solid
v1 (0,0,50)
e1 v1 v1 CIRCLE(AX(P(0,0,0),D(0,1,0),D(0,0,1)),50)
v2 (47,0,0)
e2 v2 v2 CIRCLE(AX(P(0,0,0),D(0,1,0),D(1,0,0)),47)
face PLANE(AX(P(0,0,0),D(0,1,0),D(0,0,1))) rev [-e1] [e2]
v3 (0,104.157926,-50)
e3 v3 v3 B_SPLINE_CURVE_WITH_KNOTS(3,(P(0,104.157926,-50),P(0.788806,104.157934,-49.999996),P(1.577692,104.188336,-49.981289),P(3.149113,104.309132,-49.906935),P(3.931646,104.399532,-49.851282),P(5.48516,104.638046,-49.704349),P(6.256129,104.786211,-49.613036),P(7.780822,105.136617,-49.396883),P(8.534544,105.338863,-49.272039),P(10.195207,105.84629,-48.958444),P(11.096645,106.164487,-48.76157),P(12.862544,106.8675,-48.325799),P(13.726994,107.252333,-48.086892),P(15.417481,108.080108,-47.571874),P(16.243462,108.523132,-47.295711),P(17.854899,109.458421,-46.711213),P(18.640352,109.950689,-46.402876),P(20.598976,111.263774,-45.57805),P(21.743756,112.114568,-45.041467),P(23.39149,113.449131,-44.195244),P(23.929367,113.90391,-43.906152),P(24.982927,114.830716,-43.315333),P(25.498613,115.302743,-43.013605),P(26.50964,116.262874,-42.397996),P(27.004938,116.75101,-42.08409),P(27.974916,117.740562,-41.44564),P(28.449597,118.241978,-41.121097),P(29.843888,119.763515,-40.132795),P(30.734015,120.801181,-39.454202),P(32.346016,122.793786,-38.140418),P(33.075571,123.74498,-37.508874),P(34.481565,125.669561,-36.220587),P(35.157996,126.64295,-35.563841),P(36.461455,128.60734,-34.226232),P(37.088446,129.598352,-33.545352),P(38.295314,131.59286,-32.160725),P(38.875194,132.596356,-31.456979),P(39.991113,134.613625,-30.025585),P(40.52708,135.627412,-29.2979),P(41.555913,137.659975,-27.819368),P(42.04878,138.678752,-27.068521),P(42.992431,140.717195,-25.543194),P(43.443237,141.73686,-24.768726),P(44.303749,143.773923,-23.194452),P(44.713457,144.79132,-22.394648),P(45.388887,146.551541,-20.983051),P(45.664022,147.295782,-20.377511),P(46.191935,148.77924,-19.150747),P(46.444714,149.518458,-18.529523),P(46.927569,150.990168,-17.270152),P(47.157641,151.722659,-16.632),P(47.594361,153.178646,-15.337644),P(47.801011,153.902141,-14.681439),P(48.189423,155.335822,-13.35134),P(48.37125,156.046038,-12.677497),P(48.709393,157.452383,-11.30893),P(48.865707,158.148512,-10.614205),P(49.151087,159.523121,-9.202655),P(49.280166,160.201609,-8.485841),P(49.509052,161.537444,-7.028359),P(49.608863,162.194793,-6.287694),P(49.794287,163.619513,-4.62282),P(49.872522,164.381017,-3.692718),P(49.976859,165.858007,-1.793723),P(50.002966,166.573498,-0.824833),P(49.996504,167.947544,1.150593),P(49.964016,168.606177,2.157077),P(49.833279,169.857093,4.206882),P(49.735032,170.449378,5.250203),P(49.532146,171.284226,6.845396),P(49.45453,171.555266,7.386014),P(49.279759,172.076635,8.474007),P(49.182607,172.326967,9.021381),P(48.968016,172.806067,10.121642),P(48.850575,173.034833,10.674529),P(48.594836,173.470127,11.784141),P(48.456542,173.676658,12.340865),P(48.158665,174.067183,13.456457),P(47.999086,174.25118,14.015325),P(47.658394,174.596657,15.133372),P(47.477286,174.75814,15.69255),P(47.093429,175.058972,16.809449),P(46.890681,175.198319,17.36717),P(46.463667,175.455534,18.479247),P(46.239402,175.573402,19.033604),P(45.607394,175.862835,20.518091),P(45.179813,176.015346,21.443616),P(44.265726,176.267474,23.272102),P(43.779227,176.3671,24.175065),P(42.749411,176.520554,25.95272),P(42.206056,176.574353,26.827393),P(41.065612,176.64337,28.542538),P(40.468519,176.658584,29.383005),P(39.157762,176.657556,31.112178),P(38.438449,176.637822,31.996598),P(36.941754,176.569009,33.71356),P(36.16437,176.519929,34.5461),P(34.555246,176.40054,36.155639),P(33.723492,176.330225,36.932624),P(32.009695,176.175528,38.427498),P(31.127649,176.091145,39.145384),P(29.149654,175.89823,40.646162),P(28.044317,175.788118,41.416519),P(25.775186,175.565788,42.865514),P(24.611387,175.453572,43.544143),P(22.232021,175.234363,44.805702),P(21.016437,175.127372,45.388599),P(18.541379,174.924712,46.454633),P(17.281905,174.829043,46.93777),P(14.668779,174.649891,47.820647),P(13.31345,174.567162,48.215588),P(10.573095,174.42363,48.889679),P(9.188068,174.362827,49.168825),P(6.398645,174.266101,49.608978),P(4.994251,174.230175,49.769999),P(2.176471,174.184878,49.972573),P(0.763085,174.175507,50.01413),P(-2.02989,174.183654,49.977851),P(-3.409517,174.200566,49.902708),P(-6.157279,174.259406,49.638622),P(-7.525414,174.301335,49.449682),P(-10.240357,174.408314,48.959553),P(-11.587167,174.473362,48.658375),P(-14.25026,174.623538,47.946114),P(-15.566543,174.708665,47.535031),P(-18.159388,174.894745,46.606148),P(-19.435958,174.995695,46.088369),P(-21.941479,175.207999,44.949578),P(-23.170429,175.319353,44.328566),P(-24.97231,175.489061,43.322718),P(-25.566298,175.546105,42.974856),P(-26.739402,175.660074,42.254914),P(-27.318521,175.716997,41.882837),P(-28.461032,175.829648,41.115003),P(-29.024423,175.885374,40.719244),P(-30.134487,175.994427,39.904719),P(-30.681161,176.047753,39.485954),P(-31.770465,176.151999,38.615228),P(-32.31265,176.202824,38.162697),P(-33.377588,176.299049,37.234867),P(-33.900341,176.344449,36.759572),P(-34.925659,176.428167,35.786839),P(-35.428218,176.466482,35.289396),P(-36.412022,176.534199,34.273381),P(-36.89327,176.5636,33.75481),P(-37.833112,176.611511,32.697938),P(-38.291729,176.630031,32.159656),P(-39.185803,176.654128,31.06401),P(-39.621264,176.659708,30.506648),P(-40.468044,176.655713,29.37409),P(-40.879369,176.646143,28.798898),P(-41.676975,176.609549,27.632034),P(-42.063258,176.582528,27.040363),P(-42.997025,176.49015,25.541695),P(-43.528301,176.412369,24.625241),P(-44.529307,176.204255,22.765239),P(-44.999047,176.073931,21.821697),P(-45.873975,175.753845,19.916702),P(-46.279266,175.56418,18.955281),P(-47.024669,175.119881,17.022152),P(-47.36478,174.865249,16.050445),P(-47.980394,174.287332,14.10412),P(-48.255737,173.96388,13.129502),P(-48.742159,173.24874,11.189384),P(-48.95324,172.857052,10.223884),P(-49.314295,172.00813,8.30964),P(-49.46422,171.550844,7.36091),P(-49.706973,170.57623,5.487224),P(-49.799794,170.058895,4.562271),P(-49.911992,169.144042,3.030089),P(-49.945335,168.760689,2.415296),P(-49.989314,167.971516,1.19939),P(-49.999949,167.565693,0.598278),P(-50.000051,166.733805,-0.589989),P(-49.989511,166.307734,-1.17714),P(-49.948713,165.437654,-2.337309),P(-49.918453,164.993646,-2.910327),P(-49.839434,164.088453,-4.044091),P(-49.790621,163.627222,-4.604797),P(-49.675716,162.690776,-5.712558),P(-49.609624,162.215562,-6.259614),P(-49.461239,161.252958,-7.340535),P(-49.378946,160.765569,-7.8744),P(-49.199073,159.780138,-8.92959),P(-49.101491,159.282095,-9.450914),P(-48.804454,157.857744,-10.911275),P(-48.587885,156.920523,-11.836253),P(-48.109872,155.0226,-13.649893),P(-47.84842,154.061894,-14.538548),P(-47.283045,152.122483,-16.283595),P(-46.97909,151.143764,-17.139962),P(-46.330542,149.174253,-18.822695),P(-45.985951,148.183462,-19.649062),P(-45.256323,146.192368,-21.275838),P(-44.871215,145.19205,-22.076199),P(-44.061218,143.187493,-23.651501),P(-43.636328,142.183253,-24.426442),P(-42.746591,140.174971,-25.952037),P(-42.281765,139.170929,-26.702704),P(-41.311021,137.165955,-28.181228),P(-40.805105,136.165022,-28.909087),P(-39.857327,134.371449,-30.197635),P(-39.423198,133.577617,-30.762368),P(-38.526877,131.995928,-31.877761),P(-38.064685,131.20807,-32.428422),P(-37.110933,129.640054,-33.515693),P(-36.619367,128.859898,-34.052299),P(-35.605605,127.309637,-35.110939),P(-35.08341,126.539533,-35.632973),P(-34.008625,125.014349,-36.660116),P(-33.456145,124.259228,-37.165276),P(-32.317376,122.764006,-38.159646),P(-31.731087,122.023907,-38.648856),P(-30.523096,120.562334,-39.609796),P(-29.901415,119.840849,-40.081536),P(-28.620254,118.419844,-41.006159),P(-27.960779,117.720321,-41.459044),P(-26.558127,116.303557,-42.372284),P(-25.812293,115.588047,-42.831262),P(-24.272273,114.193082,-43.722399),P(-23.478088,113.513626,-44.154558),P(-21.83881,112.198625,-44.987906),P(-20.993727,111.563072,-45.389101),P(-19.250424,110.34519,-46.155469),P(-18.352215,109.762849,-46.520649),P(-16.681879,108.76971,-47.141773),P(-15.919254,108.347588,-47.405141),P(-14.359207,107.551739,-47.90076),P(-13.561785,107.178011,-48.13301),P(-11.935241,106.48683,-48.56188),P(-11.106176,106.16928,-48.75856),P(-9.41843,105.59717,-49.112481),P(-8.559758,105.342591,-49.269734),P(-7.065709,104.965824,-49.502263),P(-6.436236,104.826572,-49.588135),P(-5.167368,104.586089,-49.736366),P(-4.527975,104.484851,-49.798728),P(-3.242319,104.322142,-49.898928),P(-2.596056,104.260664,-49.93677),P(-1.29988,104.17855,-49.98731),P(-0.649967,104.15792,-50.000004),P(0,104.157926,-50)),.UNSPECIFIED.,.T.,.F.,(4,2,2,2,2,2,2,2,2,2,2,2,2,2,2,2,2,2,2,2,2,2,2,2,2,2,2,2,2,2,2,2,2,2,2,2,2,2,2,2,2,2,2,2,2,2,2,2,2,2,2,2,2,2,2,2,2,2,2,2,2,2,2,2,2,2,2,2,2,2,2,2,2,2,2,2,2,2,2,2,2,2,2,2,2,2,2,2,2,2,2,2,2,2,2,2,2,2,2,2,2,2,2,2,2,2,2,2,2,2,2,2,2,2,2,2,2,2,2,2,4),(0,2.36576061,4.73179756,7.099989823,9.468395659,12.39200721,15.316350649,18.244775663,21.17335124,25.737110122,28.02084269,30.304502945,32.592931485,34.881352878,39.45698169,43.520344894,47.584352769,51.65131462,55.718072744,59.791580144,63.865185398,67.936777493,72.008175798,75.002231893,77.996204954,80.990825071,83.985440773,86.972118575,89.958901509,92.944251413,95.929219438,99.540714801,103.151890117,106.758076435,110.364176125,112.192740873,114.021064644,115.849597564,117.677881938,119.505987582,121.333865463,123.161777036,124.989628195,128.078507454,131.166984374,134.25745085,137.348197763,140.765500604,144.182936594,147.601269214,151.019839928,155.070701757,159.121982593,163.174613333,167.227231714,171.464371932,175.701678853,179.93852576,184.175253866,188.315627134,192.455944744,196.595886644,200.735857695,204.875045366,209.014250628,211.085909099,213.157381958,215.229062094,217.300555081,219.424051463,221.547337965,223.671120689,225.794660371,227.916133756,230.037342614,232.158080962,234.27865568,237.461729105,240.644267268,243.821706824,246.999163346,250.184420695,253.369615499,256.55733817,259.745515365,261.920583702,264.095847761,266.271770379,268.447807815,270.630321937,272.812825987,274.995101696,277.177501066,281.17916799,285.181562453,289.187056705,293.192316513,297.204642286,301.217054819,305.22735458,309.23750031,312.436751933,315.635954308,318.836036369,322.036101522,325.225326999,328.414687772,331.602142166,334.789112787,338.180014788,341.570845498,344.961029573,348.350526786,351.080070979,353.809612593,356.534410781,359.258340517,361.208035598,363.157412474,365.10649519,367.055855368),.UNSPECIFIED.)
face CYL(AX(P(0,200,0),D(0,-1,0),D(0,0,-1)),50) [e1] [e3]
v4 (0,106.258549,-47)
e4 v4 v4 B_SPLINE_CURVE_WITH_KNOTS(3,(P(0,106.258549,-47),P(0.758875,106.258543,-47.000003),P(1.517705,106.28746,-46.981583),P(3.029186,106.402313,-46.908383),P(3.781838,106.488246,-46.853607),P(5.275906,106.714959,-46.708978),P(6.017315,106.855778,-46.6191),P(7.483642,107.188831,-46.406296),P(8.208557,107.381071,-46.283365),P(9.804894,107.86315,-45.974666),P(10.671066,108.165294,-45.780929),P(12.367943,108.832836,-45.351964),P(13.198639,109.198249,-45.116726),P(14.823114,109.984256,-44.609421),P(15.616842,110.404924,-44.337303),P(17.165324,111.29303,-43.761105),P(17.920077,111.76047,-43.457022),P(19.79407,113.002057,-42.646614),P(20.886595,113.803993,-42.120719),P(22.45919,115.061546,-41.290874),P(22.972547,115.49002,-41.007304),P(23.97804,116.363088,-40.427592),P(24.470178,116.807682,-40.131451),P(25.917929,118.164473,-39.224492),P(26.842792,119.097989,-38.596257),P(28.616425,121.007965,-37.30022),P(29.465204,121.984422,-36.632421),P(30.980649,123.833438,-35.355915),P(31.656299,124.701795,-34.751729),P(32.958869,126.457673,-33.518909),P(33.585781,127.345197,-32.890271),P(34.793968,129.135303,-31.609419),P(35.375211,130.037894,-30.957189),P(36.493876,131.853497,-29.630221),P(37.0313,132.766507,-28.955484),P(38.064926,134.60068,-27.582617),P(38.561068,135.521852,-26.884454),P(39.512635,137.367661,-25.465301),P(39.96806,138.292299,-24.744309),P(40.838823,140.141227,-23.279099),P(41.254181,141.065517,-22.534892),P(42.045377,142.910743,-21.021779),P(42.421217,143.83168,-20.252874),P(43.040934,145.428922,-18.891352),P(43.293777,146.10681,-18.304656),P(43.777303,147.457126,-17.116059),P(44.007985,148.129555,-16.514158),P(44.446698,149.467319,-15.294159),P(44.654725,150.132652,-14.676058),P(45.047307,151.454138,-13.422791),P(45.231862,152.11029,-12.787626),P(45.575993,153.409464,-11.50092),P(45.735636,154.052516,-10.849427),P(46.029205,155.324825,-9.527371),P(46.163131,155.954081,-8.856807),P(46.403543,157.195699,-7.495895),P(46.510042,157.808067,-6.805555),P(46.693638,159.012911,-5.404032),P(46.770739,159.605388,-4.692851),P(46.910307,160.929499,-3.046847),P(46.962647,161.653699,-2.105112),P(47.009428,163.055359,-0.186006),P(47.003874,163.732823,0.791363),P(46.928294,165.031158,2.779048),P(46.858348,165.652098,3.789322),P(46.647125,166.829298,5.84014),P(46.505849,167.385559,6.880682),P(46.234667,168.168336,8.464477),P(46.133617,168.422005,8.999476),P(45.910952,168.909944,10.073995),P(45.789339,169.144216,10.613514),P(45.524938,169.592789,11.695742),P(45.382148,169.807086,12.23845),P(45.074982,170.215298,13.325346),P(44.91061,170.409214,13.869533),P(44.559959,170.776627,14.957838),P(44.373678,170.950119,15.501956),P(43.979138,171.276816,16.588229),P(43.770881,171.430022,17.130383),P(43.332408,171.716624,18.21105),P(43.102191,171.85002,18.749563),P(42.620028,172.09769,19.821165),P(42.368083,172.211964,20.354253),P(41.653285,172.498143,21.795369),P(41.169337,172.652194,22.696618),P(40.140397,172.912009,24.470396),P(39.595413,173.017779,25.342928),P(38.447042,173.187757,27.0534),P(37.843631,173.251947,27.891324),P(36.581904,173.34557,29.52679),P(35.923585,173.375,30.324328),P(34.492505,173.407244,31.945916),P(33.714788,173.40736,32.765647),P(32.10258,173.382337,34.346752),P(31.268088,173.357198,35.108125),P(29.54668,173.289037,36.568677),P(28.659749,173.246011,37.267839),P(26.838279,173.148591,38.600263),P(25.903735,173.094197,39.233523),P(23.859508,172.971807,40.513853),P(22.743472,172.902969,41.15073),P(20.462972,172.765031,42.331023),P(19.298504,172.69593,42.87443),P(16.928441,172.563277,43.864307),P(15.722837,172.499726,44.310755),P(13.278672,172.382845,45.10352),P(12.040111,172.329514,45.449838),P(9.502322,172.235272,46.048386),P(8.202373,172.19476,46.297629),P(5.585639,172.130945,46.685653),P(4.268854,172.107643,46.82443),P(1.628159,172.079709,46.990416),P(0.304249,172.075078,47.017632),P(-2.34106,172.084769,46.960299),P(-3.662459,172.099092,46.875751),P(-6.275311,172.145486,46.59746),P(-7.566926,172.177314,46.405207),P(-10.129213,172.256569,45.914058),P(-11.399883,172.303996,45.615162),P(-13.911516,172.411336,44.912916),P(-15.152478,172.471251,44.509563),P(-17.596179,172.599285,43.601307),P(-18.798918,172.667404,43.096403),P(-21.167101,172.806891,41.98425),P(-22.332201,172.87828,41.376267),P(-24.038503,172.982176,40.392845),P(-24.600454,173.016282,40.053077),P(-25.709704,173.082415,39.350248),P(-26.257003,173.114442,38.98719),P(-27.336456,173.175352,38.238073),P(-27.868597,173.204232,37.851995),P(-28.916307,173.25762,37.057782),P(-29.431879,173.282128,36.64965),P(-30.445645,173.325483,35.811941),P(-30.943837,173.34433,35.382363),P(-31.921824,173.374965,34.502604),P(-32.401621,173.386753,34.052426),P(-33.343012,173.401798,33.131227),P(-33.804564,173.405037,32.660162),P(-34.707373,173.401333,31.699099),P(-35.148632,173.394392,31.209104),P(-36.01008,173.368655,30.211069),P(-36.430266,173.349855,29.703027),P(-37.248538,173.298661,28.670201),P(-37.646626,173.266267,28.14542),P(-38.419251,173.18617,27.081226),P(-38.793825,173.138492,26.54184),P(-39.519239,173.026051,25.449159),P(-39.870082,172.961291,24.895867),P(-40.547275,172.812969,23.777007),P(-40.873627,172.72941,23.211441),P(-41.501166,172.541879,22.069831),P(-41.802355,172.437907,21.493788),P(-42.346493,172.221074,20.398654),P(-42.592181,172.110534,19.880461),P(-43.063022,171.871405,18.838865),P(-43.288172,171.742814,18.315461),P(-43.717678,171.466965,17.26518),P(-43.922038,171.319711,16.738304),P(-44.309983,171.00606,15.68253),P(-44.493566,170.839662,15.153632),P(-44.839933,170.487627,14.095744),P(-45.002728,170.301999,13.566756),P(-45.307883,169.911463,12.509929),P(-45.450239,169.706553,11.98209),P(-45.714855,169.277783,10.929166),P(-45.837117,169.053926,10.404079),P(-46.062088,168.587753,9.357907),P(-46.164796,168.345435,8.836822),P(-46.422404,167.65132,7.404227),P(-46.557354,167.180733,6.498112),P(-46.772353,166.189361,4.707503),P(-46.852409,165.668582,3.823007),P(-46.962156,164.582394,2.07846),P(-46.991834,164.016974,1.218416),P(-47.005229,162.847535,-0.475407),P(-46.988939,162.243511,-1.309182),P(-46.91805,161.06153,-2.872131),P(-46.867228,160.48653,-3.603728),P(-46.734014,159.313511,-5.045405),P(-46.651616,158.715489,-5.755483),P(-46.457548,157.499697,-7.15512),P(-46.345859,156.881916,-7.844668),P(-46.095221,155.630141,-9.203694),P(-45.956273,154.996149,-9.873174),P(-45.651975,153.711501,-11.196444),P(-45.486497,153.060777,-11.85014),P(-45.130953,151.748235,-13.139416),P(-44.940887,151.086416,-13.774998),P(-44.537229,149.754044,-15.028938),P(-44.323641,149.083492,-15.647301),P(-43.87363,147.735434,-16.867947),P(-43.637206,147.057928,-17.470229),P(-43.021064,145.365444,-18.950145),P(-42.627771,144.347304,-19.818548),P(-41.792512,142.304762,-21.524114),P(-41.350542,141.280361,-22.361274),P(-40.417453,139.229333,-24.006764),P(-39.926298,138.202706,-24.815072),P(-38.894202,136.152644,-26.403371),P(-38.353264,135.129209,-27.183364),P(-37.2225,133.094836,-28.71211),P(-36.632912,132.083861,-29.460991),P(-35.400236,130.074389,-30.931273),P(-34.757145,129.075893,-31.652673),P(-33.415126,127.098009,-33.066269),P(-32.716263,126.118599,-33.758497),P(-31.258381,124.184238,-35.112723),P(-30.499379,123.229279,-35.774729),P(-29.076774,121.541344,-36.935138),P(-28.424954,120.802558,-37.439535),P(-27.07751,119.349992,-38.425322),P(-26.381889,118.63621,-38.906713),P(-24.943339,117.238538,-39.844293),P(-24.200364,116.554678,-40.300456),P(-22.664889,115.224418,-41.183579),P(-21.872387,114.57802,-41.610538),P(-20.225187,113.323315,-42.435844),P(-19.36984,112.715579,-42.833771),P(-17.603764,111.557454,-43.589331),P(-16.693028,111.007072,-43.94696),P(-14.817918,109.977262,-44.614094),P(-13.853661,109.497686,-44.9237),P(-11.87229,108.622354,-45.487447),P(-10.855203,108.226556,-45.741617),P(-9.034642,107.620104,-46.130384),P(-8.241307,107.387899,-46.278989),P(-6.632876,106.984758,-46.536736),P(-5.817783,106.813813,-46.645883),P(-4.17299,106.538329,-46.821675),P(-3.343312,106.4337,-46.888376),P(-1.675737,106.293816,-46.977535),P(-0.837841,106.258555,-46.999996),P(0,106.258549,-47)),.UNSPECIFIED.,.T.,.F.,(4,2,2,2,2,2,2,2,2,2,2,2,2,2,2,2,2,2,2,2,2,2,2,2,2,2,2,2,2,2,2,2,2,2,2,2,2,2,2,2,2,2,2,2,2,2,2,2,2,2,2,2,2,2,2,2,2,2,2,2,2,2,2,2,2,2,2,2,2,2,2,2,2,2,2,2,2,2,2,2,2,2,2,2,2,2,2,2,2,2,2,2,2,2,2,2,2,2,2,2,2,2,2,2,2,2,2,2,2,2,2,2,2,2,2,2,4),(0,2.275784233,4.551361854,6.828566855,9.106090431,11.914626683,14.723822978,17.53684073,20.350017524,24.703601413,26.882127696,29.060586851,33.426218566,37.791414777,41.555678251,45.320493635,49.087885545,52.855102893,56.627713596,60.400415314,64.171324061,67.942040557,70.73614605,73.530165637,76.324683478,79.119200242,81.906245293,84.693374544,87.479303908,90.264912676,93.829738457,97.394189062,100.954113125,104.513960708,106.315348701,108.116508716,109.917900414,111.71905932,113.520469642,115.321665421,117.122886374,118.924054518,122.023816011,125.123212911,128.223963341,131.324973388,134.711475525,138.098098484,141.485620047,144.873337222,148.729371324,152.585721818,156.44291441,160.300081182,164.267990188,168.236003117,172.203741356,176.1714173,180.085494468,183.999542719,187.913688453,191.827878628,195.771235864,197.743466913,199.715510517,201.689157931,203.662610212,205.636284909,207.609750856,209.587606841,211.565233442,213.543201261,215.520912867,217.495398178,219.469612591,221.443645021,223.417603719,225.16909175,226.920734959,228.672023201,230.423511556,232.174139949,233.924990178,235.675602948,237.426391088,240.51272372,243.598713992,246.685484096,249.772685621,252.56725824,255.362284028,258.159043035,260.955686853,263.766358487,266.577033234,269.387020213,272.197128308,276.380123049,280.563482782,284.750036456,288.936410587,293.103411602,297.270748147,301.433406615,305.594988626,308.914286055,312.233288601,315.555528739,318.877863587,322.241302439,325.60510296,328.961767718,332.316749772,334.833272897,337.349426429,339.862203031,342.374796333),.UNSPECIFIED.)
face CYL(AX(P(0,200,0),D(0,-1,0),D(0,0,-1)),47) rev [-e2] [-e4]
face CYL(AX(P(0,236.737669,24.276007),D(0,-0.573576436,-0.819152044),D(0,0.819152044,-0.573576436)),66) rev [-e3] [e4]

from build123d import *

# Parameters (mm, degrees)
EXTRUDE_1_OUTLINE_R      = 50
EXTRUDE_1_OUTLINE_R_2    = 47
EXTRUDE_1_DEPTH          = 200
CUT_EXTRUDE_1_DEPTH      = 213.132034356
CUT_EXTRUDE_1_DEPTH_BACK = 213.132034356
SKETCH_2_R               = 66


# Read off the part's stored shape, not the designer's step: Вытянуть-Тонкостенный1
with BuildPart() as part:
    # Вытянуть-Тонкостенный1 outline → Вытянуть-Тонкостенный1 (new body)
    with BuildSketch(Plane(origin=(0, 0, 0), x_dir=(1, 0, 0), z_dir=(0, 1, 0))):
        Circle(EXTRUDE_1_OUTLINE_R)
        Circle(EXTRUDE_1_OUTLINE_R_2, mode=Mode.SUBTRACT)
    extrude(amount=EXTRUDE_1_DEPTH)

    # Эскиз2 → Вырез-Вытянуть1 (cut, two sides: drawn at the far end of the back side and taken through both)
    with BuildSketch(Plane(origin=(0, 0, 0), x_dir=(1, 0, 0), z_dir=(0, -0.5735764363510444, -0.819152044288993)).offset(-CUT_EXTRUDE_1_DEPTH_BACK)):
        with Locations((0, -180)):
            Circle(SKETCH_2_R)
    extrude(amount=CUT_EXTRUDE_1_DEPTH + CUT_EXTRUDE_1_DEPTH_BACK, mode=Mode.SUBTRACT)


solid = part.part
